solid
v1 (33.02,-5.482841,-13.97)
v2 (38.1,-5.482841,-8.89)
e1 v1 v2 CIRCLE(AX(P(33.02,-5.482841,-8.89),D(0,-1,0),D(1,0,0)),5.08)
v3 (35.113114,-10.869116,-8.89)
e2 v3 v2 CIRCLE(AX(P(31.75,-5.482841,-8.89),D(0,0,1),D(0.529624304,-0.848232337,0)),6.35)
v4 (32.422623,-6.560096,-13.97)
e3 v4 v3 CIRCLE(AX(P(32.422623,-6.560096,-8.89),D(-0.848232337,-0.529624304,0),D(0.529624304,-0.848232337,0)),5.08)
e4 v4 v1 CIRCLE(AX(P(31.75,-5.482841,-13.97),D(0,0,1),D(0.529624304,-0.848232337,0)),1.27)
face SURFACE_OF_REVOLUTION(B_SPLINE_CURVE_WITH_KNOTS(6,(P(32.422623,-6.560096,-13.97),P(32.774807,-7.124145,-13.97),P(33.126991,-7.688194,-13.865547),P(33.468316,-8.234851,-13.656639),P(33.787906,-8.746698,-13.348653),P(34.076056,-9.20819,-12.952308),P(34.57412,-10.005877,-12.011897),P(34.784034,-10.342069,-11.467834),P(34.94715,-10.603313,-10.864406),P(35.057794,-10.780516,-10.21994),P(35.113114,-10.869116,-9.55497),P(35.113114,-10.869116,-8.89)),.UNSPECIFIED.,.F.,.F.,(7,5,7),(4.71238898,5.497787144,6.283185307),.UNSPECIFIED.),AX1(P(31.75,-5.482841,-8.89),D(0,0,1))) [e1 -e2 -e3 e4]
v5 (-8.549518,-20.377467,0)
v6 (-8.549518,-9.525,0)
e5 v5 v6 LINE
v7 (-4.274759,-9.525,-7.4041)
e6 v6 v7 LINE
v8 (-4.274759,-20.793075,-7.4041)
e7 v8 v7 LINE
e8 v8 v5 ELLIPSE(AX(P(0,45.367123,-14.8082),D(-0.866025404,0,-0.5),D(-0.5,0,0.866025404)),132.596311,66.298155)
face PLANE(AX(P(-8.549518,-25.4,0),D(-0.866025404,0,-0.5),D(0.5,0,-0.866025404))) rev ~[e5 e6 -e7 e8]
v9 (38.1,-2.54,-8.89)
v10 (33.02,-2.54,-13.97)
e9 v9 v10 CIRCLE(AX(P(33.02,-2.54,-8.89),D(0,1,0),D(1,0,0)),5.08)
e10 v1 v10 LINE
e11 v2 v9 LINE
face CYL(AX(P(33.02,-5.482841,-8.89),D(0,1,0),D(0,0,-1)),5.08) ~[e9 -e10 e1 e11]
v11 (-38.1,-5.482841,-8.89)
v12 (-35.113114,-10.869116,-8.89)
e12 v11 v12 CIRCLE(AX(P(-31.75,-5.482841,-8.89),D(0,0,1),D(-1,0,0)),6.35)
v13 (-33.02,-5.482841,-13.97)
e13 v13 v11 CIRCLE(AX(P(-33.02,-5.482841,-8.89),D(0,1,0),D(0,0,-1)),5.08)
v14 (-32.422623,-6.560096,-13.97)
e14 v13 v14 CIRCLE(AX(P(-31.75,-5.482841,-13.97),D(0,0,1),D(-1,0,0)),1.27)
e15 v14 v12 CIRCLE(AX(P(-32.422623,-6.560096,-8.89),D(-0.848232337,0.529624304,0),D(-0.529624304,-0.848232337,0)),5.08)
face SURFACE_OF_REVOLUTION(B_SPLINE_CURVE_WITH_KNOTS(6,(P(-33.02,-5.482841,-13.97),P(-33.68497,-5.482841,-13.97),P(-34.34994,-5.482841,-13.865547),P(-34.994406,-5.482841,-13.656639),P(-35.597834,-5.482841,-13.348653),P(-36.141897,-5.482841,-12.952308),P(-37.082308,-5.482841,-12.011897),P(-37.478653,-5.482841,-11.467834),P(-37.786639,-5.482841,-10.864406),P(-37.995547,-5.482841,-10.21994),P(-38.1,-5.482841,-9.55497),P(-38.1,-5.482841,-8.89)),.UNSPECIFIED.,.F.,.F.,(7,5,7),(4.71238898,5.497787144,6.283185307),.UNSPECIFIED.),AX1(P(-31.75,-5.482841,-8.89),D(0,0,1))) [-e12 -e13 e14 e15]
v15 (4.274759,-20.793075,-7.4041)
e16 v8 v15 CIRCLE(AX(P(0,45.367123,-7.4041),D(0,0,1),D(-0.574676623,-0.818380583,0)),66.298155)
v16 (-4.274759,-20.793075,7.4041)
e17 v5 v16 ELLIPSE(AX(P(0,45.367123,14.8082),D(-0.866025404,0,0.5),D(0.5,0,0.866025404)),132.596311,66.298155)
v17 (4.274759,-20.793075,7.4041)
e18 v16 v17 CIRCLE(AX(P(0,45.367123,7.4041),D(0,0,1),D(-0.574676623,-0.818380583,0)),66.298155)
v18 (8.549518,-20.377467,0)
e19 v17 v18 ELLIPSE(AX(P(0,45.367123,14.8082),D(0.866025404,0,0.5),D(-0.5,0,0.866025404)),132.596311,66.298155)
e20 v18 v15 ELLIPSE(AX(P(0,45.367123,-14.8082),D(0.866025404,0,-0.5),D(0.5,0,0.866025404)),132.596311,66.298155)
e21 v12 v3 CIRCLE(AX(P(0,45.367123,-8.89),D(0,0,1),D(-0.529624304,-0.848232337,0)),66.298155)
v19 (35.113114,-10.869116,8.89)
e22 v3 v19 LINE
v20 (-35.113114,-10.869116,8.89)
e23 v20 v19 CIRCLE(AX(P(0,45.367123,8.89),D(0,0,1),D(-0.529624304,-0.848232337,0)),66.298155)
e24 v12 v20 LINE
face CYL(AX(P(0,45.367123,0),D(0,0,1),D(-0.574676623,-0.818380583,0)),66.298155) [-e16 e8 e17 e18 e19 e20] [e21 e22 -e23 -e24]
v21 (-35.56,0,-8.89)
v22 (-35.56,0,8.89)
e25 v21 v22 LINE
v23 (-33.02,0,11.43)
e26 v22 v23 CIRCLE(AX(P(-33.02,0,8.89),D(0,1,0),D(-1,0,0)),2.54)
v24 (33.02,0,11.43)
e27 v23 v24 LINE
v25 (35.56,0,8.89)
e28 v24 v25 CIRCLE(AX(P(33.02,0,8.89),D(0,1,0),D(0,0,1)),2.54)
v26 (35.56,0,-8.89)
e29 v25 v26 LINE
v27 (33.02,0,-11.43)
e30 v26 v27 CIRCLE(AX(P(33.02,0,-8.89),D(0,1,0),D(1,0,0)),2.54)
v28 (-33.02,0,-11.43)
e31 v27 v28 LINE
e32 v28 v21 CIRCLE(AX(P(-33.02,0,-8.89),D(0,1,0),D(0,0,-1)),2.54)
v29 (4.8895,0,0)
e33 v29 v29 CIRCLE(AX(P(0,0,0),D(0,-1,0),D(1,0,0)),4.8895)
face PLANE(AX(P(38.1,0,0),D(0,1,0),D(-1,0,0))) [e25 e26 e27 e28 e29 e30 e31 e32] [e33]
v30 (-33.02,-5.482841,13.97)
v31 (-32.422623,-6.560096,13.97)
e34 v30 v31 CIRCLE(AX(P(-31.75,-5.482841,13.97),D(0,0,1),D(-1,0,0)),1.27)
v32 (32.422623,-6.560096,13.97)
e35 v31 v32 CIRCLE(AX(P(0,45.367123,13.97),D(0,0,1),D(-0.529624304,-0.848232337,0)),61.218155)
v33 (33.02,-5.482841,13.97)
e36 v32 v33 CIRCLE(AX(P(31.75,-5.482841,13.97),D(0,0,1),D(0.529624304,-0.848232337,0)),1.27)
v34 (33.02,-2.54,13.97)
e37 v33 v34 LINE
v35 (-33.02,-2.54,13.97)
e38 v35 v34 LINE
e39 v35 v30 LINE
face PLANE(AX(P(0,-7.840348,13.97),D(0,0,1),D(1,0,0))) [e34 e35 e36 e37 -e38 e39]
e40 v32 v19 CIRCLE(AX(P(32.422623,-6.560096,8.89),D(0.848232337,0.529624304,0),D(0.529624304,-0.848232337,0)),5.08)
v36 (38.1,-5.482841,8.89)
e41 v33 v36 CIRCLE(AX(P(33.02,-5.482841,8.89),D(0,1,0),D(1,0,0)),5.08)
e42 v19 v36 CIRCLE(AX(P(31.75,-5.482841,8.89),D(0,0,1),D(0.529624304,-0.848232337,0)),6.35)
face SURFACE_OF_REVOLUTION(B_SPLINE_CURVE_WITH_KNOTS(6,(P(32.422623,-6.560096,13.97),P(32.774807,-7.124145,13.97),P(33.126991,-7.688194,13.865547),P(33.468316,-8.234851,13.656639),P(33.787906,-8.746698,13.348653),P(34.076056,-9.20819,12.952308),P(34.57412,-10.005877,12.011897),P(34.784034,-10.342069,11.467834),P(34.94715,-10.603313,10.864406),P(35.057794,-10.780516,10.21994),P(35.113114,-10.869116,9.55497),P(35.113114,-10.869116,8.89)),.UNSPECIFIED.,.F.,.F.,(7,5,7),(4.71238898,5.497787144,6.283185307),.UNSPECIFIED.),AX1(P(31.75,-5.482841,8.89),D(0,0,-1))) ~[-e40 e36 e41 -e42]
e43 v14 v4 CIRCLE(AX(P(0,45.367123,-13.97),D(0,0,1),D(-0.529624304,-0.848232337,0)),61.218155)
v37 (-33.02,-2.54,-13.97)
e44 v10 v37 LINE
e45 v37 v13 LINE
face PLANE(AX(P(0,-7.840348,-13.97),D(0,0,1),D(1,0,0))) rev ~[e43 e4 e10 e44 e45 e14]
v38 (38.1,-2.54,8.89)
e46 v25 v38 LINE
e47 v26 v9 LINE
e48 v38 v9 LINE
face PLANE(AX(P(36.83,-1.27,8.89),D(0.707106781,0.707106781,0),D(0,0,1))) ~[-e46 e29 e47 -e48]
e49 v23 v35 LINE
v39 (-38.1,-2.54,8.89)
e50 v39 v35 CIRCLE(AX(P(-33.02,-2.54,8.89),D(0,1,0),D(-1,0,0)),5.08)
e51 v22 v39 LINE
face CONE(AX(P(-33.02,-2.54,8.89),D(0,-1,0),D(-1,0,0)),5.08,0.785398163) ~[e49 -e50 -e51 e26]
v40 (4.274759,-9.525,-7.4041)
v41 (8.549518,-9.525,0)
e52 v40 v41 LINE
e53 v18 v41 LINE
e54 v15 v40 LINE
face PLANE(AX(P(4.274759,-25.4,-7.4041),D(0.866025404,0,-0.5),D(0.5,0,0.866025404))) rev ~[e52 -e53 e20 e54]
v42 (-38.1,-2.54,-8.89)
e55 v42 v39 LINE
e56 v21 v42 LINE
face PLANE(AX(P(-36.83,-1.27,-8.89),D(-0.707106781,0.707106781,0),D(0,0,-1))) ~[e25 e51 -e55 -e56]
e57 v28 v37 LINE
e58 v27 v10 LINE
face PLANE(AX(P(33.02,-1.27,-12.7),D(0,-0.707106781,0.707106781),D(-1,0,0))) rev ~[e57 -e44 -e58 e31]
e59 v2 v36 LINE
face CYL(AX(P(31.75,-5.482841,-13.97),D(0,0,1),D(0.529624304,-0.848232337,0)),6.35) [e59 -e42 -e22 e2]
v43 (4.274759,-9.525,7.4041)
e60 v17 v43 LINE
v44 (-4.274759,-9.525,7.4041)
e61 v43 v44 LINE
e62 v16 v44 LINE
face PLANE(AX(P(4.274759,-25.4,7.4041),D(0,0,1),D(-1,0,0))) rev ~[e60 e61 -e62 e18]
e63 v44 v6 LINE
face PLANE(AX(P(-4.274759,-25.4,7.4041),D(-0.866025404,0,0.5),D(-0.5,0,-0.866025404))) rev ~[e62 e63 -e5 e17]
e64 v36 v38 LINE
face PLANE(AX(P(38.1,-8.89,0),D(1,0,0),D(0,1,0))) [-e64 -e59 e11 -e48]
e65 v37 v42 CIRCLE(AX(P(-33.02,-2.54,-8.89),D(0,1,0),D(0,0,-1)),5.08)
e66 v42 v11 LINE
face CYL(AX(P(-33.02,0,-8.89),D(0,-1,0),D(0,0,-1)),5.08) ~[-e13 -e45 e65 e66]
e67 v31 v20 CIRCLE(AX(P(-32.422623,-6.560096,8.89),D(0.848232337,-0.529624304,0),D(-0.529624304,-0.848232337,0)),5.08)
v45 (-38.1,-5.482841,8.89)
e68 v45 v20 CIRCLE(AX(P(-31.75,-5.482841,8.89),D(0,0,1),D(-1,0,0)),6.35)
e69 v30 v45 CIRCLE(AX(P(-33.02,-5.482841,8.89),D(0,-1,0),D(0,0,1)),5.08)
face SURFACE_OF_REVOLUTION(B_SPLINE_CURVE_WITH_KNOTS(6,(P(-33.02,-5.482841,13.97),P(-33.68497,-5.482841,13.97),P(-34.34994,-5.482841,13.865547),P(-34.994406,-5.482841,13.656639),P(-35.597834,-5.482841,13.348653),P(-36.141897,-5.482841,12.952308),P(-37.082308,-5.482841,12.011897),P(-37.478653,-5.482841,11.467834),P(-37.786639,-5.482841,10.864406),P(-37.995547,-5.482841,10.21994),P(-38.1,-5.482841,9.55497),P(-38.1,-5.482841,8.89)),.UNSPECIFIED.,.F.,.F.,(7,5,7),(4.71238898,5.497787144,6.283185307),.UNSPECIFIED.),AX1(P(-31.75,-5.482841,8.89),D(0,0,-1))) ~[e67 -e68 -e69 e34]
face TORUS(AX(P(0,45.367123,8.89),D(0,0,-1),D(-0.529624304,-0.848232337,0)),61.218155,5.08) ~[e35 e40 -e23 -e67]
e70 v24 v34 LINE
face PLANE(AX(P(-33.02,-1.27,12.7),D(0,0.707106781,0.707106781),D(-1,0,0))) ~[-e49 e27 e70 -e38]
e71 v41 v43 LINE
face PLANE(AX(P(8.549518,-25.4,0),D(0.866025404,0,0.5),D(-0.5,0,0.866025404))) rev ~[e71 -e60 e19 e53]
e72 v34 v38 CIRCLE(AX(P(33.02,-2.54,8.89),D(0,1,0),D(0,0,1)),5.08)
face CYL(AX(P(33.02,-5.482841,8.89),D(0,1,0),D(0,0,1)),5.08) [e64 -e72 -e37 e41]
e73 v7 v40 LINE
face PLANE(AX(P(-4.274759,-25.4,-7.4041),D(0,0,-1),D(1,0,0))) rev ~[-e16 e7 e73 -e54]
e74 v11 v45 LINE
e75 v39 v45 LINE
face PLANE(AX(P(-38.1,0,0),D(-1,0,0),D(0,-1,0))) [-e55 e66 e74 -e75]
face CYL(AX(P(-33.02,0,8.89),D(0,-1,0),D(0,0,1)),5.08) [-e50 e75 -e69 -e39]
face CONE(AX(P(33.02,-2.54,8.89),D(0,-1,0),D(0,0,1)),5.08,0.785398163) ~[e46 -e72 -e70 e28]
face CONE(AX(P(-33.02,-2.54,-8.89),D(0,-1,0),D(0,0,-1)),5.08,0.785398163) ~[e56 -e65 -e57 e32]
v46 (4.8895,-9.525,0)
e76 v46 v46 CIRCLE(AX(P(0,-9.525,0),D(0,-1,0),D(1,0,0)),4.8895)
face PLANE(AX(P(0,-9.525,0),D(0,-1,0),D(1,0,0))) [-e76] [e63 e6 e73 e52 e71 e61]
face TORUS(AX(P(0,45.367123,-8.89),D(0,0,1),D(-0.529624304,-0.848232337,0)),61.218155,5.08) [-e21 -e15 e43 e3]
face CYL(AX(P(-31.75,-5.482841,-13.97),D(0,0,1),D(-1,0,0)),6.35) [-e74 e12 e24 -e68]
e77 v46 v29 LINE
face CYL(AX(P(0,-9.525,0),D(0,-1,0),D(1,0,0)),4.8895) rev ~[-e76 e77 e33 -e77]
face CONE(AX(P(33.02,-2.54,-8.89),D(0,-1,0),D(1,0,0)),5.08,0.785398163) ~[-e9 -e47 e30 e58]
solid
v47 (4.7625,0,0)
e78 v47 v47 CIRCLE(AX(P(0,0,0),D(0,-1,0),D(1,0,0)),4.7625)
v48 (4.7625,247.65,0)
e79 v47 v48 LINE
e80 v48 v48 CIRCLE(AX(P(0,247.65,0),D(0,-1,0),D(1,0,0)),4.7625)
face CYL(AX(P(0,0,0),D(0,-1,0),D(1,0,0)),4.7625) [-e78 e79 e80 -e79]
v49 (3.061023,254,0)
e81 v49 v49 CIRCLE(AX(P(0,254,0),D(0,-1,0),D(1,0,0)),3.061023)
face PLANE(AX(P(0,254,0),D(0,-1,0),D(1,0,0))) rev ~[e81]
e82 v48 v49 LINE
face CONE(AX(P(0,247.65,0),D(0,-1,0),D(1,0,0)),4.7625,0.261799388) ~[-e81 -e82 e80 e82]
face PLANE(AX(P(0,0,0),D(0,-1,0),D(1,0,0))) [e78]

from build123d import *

# Parameters (mm, degrees)
F0_R      = 4.7625
F1_DEPTH  = 254
F2_SIZE2  = 1.7014773719
F2_SIZE   = 6.35
F4_DEPTH  = 13.97
F7_DEPTH  = 15.875
F8_R      = 6.35
F9_R      = 4.8895
F10_DEPTH = 263.526
F11_R     = 5.08
F12_SIZE  = 2.54


# Not quite as in the source:
# - a feature names something its author has since deleted; it is built from what else it names


with BuildPart() as f1:
    # F0 (on Front) → F1 (new body)
    with BuildSketch(Plane.XZ):
        Circle(F0_R)
    extrude(amount=-F1_DEPTH)

    # F2
    f2_edges = [f1.edges().sort_by_distance(p)[0] for p in [
        (-4.7625, 254, 0),
    ]]
    f2_side = f1.faces().sort_by_distance((-4.7625, 127, 0))[0]
    chamfer(f2_edges, length=F2_SIZE, length2=F2_SIZE2, reference=f2_side)


with BuildPart() as f4:
    # F3 (on Top) → F4 (new body, symmetric)
    with BuildSketch(Plane.XY):
        with BuildLine():
            Line((-38.1, 0), (-38.1, -8.89))
            ThreePointArc((-38.1, -8.89), (0, -20.9310323016), (38.1, -8.89))
            Line((38.1, -8.89), (38.1, 0))
            Line((38.1, 0), (-38.1, 0))
        make_face()
    extrude(amount=F4_DEPTH, both=True)

    # F6 (on offset) → F7 (cut)
    with BuildSketch(Plane.XZ.offset(25.4)):
        Polygon((8.5495182562, 0), (4.2747591281, 7.4041), (-4.2747591281, 7.4041), (-8.5495182562, 0), (-4.2747591281, -7.4041), (4.2747591281, -7.4041), align=None)
    extrude(amount=-F7_DEPTH, mode=Mode.SUBTRACT)

    # F8
    f8_edges = [f4.edges().sort_by_distance(p)[0] for p in [
        (38.1, -8.89, 0),
        (-38.1, -8.89, 0),
    ]]
    fillet(f8_edges, radius=F8_R)

    # F9 (on face) → F10 (cut, through all)
    with BuildSketch(Plane.XZ.offset(9.525)):
        Circle(F9_R)
    extrude(amount=-F10_DEPTH, mode=Mode.SUBTRACT)

    # F11
    f11_edges = [f4.edges().sort_by_distance(p)[0] for p in [
        (0, -20.931032, -13.97),
        (0, -20.931032, 13.97),
        (-37.3033, -8.562348, -13.97),
        (37.3033, -8.562348, -13.97),
        (-37.3033, -8.562348, 13.97),
        (37.3033, -8.562348, 13.97),
    ]]
    fillet(f11_edges, radius=F11_R)

    # F12
    f12_edges = [f4.edges().sort_by_distance(p)[0] for p in [
        (0, 0, -13.97),
        (-38.1, 0, 0),
        (0, 0, 13.97),
        (38.1, 0, 0),
        (-36.612102, 0, 12.482102),
        (-36.612102, 0, -12.482102),
        (36.612102, 0, -12.482102),
        (36.612102, 0, 12.482102),
    ]]
    chamfer(f12_edges, length=F12_SIZE)


solid = Compound([f1.part, f4.part])
